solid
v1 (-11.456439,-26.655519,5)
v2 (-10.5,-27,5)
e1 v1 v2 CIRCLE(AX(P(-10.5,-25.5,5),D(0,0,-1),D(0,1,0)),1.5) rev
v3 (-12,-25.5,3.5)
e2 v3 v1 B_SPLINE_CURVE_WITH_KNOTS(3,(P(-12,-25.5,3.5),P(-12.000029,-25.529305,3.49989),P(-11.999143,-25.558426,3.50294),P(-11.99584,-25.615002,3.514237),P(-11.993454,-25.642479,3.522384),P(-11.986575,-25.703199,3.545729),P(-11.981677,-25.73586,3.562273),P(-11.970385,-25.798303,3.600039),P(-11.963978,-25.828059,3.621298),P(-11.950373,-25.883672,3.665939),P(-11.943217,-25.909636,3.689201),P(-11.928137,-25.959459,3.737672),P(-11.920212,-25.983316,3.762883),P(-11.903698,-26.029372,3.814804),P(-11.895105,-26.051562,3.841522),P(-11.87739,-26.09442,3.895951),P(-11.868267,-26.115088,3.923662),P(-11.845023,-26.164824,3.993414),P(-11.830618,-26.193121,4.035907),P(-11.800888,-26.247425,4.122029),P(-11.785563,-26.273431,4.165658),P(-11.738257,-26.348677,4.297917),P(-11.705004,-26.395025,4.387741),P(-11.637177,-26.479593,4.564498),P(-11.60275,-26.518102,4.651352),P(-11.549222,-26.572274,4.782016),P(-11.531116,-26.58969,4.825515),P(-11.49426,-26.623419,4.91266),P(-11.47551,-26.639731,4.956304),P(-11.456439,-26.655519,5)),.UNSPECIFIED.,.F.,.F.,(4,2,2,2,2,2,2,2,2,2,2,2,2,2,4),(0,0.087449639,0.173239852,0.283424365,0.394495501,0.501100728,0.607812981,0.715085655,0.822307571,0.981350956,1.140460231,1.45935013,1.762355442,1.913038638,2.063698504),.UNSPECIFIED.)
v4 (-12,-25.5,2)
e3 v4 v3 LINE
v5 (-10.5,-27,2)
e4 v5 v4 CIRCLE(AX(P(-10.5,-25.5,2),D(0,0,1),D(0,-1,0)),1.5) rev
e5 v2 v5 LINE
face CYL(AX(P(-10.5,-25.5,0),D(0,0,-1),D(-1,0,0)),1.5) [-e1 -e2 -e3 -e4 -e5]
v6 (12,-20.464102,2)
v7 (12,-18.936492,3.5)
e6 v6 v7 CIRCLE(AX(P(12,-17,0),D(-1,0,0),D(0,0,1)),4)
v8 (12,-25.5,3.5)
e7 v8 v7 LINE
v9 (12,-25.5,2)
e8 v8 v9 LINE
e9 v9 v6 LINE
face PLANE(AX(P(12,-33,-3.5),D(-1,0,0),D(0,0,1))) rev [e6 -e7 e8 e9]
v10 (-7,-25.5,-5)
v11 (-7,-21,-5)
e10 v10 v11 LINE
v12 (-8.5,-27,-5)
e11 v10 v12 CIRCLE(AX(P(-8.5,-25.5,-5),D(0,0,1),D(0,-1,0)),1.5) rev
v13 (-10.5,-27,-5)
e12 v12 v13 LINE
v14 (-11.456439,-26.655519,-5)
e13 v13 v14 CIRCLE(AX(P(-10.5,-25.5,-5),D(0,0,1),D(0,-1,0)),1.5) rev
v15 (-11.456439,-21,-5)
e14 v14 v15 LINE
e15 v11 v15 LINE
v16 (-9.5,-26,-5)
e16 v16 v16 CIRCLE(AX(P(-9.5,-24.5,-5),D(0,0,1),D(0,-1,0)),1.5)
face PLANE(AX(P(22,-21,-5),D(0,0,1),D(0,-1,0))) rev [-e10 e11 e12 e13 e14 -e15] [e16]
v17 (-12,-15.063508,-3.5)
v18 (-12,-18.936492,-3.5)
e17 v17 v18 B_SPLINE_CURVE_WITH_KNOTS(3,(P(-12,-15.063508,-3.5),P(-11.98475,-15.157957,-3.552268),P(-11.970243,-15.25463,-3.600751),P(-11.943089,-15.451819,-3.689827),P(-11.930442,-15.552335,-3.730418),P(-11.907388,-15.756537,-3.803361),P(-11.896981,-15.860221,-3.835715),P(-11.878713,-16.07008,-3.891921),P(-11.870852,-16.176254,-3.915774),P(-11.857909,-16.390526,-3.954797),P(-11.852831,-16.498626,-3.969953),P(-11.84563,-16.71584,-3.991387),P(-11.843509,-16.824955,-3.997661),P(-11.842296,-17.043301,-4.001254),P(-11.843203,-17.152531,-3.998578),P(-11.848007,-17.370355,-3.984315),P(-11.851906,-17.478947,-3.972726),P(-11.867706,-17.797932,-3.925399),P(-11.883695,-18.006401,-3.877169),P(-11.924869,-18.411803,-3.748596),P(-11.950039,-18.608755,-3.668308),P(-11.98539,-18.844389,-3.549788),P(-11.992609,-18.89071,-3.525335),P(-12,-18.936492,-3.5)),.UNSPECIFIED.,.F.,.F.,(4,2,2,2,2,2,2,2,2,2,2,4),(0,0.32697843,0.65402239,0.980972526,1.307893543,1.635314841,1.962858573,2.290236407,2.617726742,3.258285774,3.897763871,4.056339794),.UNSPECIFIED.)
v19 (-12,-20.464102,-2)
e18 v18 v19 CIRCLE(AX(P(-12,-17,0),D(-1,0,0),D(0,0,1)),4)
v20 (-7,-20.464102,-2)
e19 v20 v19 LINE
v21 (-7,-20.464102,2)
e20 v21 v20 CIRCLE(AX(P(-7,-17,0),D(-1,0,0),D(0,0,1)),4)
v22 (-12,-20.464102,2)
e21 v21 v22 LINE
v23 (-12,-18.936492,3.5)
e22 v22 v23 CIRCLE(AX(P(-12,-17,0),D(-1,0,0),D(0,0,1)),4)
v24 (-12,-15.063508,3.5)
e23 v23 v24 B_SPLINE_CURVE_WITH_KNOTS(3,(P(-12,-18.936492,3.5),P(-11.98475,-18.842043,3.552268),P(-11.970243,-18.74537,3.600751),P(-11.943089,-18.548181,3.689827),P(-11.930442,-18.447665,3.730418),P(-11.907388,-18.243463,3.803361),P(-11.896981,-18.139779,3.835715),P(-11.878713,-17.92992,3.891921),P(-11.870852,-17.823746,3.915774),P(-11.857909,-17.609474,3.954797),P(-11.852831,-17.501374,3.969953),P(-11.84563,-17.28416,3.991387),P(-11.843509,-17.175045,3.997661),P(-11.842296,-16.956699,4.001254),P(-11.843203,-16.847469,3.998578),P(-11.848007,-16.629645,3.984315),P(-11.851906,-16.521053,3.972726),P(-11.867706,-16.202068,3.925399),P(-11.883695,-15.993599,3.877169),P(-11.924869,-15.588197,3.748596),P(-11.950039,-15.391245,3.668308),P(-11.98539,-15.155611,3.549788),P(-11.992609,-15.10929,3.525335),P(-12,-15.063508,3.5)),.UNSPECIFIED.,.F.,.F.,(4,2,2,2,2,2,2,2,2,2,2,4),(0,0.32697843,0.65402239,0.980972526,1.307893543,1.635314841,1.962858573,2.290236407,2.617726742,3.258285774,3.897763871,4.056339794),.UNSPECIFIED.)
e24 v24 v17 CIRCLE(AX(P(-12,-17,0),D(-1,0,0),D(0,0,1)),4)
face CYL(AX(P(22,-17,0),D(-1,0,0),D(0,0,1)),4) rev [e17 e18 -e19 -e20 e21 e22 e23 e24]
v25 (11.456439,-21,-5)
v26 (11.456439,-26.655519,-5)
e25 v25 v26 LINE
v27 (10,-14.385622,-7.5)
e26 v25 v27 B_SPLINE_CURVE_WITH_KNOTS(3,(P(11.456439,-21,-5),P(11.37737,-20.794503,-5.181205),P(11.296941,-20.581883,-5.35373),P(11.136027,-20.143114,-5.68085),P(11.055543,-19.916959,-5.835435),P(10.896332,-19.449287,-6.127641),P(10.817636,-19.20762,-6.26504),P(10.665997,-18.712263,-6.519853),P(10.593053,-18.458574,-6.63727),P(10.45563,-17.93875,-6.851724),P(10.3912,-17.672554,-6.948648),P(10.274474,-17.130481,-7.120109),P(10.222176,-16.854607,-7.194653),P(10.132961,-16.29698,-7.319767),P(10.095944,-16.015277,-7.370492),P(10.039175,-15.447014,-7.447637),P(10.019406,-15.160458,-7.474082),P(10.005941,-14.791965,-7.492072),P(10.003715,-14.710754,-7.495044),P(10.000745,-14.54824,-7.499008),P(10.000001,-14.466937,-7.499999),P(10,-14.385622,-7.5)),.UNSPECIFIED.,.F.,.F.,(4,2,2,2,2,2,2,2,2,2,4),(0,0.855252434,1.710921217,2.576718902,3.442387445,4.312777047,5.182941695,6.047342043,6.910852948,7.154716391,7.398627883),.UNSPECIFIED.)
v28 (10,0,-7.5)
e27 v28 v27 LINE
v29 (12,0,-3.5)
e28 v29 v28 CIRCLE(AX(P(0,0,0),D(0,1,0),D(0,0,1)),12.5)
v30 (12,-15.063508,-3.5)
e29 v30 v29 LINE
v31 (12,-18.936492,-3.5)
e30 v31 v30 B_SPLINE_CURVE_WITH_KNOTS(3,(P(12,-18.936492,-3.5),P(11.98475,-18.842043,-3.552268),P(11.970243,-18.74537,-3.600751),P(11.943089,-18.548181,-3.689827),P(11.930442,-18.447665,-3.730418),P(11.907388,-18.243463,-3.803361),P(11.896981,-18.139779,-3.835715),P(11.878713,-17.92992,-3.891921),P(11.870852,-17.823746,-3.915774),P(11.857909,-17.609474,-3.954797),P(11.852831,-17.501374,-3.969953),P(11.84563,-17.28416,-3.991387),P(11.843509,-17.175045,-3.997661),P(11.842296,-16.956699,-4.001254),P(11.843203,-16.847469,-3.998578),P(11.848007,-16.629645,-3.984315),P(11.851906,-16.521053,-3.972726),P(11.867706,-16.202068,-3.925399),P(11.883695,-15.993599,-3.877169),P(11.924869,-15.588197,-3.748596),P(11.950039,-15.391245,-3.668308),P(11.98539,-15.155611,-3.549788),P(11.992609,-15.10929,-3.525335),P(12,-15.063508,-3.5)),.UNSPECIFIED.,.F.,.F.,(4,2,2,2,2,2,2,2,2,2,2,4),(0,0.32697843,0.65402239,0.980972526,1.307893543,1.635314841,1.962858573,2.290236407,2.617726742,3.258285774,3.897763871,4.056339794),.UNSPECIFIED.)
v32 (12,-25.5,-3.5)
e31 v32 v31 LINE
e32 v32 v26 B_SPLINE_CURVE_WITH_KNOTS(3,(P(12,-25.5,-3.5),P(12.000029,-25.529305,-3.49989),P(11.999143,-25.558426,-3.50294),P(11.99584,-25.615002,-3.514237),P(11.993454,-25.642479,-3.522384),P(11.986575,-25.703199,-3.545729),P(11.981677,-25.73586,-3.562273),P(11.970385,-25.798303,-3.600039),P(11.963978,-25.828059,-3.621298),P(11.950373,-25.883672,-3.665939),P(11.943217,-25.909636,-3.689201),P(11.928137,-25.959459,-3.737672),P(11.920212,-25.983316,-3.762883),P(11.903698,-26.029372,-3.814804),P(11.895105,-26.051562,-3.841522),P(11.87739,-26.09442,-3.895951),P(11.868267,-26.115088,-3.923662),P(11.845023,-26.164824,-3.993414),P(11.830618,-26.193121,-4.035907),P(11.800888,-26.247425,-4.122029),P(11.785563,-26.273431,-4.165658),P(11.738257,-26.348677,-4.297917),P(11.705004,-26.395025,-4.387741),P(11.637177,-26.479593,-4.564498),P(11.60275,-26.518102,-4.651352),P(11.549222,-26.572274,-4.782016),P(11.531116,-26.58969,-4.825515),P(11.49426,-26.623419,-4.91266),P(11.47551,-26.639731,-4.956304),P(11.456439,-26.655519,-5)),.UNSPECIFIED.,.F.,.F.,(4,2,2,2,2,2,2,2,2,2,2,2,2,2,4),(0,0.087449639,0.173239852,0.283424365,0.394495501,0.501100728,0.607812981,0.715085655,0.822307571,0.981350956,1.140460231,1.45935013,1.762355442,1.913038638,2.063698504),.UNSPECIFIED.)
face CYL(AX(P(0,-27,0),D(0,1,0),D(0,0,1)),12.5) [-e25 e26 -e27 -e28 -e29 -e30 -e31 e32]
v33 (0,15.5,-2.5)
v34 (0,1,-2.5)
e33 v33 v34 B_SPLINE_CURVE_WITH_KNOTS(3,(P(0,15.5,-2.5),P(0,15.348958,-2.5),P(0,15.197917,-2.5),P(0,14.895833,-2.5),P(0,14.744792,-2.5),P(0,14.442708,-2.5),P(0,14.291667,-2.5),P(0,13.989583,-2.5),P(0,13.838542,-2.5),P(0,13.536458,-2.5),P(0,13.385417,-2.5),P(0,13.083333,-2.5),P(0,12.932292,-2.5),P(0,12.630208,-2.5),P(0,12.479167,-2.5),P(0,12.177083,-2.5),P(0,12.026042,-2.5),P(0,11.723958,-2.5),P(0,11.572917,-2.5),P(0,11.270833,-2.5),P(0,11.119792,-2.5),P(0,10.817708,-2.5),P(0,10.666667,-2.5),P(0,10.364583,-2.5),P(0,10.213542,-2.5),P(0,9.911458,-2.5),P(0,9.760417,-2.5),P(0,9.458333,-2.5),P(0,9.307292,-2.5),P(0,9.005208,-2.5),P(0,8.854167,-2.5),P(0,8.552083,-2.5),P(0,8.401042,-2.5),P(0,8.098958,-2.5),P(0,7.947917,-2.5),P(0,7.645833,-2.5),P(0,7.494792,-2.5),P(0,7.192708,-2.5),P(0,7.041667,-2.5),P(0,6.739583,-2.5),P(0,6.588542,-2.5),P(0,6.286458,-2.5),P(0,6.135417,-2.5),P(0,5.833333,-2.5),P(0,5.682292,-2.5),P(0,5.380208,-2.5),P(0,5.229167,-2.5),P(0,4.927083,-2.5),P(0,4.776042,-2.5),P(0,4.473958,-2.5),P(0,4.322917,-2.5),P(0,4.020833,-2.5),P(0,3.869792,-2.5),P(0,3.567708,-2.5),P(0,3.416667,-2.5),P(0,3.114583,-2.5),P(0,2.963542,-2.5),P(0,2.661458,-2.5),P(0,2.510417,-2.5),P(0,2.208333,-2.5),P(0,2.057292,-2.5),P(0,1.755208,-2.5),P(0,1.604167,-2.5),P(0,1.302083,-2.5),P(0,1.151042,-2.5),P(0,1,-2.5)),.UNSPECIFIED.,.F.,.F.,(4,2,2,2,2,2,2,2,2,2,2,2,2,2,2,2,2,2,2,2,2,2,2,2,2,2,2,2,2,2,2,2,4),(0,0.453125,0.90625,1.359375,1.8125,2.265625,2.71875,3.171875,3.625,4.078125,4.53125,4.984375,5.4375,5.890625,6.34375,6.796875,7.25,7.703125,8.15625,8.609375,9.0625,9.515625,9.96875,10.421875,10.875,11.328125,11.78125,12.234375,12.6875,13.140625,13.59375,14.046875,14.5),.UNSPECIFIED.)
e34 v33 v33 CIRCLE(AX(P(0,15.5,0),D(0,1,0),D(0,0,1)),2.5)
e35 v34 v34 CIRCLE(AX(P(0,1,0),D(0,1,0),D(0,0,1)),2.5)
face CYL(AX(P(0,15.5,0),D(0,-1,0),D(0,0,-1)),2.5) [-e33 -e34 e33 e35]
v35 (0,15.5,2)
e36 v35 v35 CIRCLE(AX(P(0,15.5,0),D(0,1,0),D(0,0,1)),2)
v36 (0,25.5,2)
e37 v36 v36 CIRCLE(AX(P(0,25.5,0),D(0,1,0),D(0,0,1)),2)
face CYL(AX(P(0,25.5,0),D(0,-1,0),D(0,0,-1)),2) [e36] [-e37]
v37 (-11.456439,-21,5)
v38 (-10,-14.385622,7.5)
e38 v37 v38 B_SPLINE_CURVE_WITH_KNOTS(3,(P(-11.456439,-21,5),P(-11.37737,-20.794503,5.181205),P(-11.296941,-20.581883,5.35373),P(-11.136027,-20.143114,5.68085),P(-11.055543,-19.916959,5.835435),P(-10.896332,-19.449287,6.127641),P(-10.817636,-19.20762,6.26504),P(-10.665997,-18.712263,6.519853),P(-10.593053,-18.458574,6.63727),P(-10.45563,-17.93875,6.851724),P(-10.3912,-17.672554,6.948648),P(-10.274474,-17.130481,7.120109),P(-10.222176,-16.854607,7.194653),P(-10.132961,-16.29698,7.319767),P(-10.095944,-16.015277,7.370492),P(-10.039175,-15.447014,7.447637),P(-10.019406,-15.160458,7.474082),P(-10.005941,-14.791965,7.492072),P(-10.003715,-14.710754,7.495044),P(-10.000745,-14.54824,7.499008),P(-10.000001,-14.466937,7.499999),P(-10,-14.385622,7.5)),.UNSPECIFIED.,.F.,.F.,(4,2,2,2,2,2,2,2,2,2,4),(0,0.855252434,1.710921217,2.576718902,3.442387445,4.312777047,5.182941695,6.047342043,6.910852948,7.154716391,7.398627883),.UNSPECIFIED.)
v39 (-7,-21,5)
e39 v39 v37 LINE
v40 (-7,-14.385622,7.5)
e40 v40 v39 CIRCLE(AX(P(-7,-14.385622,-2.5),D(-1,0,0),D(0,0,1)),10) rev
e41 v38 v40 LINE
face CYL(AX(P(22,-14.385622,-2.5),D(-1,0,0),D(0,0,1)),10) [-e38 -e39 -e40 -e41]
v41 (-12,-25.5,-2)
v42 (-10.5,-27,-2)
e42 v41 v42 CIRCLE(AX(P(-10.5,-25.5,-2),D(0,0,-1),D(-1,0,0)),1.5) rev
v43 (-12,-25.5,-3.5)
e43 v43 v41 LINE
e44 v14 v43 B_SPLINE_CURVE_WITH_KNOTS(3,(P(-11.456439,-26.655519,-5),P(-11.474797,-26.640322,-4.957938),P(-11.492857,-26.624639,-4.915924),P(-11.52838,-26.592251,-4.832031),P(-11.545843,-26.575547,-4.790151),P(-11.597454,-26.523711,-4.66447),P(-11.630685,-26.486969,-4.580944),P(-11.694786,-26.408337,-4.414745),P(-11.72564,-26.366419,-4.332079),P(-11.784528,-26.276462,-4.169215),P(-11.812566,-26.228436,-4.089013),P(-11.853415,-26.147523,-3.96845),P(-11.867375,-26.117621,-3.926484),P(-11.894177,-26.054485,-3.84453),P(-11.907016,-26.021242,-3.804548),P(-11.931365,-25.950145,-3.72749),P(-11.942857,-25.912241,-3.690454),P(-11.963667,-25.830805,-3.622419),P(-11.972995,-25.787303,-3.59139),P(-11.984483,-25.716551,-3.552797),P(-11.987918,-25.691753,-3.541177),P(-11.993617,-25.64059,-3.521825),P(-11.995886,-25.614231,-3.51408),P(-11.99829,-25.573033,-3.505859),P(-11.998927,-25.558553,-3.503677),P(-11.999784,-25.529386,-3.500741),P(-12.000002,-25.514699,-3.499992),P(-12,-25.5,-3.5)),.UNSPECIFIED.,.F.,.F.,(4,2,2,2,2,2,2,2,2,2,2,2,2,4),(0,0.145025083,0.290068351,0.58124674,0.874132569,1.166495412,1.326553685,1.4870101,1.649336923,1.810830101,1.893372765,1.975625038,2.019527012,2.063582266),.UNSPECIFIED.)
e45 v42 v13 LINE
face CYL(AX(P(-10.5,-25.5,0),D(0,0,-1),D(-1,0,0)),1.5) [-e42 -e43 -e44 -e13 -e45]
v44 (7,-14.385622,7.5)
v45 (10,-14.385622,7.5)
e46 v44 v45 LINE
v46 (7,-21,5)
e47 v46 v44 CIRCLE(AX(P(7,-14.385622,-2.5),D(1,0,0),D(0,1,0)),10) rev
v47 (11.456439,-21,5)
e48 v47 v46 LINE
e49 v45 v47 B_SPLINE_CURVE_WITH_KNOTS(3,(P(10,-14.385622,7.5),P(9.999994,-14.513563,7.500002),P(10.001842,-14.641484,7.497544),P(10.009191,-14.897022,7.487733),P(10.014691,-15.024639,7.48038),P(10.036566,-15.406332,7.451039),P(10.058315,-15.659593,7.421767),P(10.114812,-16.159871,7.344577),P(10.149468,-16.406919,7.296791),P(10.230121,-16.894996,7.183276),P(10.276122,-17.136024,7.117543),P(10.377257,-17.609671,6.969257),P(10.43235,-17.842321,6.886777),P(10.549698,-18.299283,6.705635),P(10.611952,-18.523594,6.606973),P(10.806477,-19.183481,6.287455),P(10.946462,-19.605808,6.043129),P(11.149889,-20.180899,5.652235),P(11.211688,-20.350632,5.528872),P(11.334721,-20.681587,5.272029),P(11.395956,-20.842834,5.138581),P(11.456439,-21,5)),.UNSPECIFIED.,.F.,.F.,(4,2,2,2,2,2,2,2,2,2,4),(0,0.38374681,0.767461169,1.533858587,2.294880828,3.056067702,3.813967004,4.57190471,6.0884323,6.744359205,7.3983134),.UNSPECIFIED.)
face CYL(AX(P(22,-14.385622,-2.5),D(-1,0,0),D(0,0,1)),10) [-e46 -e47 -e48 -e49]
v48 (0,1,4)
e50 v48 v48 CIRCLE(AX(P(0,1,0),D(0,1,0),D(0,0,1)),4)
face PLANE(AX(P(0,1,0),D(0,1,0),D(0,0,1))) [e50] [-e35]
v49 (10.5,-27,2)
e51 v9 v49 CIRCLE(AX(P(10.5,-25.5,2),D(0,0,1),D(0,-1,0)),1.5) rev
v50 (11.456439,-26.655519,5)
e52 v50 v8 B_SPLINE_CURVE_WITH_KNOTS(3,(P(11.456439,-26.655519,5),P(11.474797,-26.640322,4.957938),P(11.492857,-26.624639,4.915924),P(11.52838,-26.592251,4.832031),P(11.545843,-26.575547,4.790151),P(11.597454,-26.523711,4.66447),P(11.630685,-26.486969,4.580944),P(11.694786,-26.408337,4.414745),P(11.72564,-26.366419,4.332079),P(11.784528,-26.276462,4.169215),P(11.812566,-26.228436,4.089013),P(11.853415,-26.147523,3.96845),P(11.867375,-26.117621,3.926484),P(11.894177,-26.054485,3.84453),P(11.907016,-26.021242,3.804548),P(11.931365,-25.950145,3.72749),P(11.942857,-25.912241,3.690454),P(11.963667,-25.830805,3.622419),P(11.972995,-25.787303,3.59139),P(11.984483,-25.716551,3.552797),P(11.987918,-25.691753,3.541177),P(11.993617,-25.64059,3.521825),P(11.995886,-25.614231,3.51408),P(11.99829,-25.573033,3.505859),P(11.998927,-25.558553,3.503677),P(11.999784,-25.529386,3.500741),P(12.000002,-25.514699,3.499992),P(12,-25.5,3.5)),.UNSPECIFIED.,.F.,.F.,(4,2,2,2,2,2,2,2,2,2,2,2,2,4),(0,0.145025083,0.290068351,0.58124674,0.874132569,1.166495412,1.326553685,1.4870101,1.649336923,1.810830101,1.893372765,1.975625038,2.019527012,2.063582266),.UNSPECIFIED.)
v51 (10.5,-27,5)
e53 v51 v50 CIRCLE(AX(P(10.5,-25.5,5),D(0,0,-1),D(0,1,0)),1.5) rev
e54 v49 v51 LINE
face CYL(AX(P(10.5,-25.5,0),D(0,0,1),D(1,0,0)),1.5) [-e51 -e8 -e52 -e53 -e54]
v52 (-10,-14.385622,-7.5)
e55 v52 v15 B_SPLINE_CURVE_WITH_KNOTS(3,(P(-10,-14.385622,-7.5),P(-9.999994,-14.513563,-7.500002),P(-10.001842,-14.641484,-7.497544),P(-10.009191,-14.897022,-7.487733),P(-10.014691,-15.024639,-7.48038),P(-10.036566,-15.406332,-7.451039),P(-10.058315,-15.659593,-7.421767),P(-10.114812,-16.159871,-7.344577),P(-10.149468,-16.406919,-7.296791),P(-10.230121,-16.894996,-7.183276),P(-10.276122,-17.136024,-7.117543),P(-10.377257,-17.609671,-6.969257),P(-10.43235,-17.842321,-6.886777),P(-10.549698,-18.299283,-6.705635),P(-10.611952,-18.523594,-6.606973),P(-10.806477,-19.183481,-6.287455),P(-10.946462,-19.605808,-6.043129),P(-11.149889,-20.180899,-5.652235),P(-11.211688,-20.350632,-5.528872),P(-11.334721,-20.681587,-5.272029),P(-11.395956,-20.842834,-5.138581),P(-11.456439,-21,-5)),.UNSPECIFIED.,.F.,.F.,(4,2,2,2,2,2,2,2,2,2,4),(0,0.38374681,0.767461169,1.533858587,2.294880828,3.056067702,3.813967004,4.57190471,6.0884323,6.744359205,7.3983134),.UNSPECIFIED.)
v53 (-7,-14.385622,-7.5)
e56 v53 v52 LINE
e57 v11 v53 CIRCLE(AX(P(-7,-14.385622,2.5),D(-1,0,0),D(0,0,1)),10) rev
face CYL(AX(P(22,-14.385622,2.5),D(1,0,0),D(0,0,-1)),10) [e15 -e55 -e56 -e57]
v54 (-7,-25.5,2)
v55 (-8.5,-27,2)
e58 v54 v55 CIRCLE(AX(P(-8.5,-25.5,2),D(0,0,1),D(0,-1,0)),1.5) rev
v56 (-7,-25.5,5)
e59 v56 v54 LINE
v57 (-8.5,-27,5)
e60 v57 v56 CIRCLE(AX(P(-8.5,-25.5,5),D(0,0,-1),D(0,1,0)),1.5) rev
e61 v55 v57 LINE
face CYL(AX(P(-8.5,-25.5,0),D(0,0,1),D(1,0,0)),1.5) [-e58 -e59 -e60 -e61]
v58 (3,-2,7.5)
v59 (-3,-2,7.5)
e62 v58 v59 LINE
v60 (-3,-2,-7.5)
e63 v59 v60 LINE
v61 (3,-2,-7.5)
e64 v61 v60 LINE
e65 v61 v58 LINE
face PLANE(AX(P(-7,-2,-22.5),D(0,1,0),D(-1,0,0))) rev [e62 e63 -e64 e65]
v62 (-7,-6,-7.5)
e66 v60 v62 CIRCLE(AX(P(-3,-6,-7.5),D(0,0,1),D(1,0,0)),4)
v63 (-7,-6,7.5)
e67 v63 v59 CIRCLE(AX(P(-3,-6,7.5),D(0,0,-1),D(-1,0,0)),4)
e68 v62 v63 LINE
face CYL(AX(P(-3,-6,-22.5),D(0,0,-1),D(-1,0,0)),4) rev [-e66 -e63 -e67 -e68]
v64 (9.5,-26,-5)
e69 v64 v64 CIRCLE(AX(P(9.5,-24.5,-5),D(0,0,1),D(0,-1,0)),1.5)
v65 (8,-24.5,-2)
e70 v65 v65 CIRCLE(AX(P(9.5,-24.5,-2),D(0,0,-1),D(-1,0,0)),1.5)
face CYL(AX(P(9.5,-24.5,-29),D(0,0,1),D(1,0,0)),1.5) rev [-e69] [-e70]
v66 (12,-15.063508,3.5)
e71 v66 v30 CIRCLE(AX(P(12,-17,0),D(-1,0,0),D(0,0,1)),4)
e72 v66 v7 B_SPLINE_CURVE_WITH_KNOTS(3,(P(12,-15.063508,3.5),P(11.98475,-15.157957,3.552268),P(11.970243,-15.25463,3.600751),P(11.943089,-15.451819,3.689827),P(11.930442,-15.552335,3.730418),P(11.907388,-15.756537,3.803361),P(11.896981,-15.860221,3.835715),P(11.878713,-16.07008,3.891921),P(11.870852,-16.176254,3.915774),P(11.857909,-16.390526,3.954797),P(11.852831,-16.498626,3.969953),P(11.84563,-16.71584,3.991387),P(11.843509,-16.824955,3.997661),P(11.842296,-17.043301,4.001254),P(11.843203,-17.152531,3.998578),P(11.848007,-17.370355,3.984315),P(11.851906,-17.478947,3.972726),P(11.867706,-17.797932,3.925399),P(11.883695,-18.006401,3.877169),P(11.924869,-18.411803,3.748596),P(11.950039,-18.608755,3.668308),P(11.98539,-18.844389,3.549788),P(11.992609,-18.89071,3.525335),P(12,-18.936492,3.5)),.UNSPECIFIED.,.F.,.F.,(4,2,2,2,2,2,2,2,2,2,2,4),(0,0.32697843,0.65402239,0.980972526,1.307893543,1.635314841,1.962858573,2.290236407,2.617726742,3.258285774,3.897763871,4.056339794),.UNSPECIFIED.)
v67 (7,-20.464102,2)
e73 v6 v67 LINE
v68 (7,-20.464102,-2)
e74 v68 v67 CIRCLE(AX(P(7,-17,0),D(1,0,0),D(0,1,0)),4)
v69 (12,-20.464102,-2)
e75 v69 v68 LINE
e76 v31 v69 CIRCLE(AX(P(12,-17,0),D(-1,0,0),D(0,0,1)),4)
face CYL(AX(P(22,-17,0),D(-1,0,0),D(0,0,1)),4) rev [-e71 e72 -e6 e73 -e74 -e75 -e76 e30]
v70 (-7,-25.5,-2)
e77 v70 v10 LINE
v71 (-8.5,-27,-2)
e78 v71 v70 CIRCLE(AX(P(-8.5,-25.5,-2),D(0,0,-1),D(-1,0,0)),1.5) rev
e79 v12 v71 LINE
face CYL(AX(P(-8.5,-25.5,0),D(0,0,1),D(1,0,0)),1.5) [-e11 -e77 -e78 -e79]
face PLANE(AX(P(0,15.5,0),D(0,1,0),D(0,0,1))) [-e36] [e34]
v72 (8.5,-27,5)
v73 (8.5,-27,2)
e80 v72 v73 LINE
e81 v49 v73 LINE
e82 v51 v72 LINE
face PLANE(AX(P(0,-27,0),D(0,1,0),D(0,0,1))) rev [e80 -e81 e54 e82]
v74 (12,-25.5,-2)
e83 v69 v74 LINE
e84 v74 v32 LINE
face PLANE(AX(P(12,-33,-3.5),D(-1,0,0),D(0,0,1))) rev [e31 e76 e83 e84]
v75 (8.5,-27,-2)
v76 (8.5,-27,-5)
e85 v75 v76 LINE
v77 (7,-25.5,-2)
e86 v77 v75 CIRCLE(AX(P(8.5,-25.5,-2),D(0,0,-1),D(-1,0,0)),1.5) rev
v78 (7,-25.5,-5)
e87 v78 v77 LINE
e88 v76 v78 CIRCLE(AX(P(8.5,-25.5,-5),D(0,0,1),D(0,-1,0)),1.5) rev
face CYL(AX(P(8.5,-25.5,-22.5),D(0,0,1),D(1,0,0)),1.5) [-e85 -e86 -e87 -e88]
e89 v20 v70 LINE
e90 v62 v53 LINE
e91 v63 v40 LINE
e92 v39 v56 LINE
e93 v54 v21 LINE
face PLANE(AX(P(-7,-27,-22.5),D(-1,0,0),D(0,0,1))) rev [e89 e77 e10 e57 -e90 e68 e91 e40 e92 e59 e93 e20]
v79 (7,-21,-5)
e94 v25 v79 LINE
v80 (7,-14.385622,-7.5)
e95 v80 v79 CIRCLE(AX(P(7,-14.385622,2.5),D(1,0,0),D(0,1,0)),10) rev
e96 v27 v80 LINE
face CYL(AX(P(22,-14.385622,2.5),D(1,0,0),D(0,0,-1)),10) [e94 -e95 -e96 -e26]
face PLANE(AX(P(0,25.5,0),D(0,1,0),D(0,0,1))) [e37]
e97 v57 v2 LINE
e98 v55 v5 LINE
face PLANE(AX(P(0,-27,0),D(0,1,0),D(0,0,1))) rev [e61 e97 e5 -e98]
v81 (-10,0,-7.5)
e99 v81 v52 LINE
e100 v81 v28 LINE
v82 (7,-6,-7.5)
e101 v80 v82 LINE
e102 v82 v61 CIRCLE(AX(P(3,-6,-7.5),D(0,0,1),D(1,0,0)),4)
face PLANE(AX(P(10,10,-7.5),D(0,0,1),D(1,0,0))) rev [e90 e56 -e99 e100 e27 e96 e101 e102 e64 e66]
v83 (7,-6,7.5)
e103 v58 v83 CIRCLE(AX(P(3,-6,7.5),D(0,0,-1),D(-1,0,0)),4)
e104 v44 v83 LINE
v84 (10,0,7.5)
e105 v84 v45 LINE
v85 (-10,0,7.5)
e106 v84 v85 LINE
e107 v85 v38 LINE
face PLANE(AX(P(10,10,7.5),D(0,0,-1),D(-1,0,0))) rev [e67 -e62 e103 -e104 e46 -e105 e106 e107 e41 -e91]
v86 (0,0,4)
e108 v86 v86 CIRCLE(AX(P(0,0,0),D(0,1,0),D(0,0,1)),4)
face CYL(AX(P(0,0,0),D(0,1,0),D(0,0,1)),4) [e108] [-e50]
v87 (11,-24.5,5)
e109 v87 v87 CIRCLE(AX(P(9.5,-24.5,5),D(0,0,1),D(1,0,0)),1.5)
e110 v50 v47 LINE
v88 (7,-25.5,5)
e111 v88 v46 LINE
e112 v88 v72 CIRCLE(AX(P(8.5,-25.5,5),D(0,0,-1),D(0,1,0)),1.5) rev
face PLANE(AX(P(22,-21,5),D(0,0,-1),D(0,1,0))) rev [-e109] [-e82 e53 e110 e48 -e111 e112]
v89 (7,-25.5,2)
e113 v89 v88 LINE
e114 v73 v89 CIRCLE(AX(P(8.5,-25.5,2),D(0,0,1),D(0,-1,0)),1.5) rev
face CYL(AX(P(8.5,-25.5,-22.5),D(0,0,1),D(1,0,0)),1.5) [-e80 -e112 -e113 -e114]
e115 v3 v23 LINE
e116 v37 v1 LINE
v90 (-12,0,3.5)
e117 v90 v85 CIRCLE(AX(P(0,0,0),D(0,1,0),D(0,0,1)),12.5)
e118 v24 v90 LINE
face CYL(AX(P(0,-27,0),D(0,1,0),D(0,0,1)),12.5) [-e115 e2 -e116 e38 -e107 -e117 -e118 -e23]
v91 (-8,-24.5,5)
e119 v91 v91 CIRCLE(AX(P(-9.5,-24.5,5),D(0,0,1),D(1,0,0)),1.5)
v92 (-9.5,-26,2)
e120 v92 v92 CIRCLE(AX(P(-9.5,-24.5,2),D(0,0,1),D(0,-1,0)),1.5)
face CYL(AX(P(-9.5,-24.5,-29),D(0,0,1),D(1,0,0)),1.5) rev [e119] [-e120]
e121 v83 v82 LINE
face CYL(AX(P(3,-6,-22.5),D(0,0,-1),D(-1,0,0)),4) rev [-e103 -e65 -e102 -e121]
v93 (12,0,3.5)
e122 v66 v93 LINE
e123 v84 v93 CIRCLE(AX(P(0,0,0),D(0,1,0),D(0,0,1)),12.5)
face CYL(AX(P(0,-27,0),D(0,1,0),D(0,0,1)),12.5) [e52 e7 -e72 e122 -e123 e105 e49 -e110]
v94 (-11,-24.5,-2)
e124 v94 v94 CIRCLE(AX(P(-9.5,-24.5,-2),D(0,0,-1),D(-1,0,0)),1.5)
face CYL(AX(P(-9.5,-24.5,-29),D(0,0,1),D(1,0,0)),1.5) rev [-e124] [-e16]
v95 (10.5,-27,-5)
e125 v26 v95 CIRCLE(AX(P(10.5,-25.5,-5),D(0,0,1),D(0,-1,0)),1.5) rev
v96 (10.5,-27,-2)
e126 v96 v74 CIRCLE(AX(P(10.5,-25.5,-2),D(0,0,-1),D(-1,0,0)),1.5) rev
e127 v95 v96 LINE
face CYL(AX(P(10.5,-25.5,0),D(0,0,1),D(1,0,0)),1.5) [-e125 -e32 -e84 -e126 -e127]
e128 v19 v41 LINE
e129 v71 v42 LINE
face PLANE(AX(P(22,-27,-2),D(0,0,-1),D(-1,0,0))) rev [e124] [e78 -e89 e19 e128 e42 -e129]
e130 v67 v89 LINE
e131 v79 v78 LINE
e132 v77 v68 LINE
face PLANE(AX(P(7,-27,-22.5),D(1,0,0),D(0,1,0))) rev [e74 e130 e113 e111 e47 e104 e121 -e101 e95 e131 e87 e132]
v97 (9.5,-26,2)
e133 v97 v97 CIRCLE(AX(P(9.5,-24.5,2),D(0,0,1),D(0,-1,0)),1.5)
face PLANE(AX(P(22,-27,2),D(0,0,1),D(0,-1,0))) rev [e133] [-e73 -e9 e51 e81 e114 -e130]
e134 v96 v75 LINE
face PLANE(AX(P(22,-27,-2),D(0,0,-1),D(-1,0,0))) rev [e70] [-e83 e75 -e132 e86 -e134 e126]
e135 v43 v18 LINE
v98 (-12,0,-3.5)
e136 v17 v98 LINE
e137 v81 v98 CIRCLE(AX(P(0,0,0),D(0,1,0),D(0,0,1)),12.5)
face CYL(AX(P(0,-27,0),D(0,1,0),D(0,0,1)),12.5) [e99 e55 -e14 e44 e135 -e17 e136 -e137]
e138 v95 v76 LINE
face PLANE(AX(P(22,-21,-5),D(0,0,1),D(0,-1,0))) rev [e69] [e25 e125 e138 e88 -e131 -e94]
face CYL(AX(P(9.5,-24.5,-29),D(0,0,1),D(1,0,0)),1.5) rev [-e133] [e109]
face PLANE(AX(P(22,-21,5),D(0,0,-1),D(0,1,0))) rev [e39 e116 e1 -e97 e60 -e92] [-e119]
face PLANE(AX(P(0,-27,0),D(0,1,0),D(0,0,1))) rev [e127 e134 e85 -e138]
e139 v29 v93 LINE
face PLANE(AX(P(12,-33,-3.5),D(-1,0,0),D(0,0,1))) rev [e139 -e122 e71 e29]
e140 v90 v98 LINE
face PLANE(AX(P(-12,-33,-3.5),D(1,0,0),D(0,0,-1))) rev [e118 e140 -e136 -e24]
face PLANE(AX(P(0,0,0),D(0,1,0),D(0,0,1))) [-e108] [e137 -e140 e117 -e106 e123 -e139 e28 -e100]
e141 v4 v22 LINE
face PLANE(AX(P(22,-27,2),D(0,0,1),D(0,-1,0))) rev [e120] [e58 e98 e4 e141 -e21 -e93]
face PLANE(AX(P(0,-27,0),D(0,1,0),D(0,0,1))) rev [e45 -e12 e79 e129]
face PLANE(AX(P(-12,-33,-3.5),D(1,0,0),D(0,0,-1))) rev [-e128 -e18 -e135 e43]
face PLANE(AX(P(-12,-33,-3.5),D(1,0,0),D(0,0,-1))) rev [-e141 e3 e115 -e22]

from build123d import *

# Parameters (mm, degrees)
SKETCH_1_R          = 12.5
EXTRUDE_1_DEPTH     = 27
CUT_EXTRUDE_START   = -37
CUT_EXTRUDE_1_DEPTH = 37
CUT_EXTRUDE_START_2 = 10
CUT_EXTRUDE_2_DEPTH = 43
SKETCH_4_W          = 14
SKETCH_4_H          = 25
CUT_EXTRUDE_3_DEPTH = 30
FILLET_1_R          = 4
SKETCH_7_R          = 4
SKETCH_5_R          = 4
CUT_EXTRUDE_4_DEPTH = 34
SKETCH_9_W          = 2.5
SKETCH_9_H          = 6
CUT_EXTRUDE_5_DEPTH = 34
SKETCH_10_R         = 1.5
CUT_EXTRUDE_6_DEPTH = 34
FILLET_3_R          = 1.5
SKETCH_11_R         = 2.5
EXTRUDE_2_DEPTH     = 14.5
SKETCH_12_R         = 2
EXTRUDE_3_DEPTH     = 10
FILLET_4_R          = 10


with BuildPart() as part:
    # 草图1 → 凸台-拉伸1 (new body)
    with BuildSketch(Plane(origin=(0, 0, 0), x_dir=(1, 0, 0), z_dir=(0, 1, 0))):
        with Locations(Location((0, 0, 0), (0, 0, 270))):
            Circle(SKETCH_1_R)
    extrude(amount=-EXTRUDE_1_DEPTH)

    # 草图2 → 切除-拉伸1 (cut)
    with BuildSketch(Plane(origin=(0, -27, 0), x_dir=(-1, 0, 0), z_dir=(0, -1, 0)).offset(CUT_EXTRUDE_START)):
        with BuildLine():
            Line((-10, 7.5), (10, 7.5))
            ThreePointArc((10, 7.5), (0, 12.5), (-10, 7.5))
        make_face()
        with BuildLine():
            Line((-10, -7.5), (10, -7.5))
            ThreePointArc((10, -7.5), (0, -12.5), (-10, -7.5))
        make_face()
    extrude(amount=CUT_EXTRUDE_1_DEPTH, mode=Mode.SUBTRACT)

    # 草图3 → 切除-拉伸2 (cut)
    with BuildSketch(Plane(origin=(0, 0, 0), x_dir=(1, 0, 0), z_dir=(0, 1, 0)).offset(CUT_EXTRUDE_START_2)):
        with BuildLine():
            Line((-12, 3.5), (-12, -3.5))
            ThreePointArc((-12, -3.5), (-12.5, 0), (-12, 3.5))
        make_face()
        with BuildLine():
            Line((12, 3.5), (12, -3.5))
            ThreePointArc((12, -3.5), (12.5, 0), (12, 3.5))
        make_face()
    extrude(amount=-CUT_EXTRUDE_2_DEPTH, mode=Mode.SUBTRACT)

    # 草图4 → 切除-拉伸3 (cut)
    with BuildSketch(Plane.XY.offset(7.5)):
        with Locations((0, -14.5)):
            Rectangle(SKETCH_4_W, SKETCH_4_H)
    extrude(amount=-CUT_EXTRUDE_3_DEPTH, mode=Mode.SUBTRACT)

    # 圆角1
    fillet_1_edges = [part.edges().sort_by_distance(p)[0] for p in [
        (-7, -2, 0),
        (7, -2, 0),
    ]]
    fillet(fillet_1_edges, radius=FILLET_1_R)

    # 草图7 → 放样2 section 0
    with BuildSketch(Plane(origin=(0, 0, 0), x_dir=(1, 0, 0), z_dir=(0, 1, 0))):
        Circle(SKETCH_7_R)
    # 草图5 → 放样2 section 1
    with BuildSketch(Plane(origin=(0, 1, 0), x_dir=(1, 0, 0), z_dir=(0, 1, 0))):
        Circle(SKETCH_5_R)
    loft()

    # 草图8 → 切除-拉伸4 (cut)
    with BuildSketch(Plane.ZY.offset(12)):
        with BuildLine():
            Line((-2, -27), (2, -27))
            Line((2, -27), (2, -20.464101615))
            ThreePointArc((2, -20.464101615), (0, -13), (-2, -20.464101615))
            Line((-2, -20.464101615), (-2, -27))
        make_face()
    extrude(amount=-CUT_EXTRUDE_4_DEPTH, mode=Mode.SUBTRACT)

    # 草图9 → 切除-拉伸5 (cut)
    with BuildSketch(Plane.ZY.offset(12)):
        with Locations((6.25, -24)):
            Rectangle(SKETCH_9_W, SKETCH_9_H)
        with Locations((-6.25, -24)):
            Rectangle(SKETCH_9_W, SKETCH_9_H)
    extrude(amount=-CUT_EXTRUDE_5_DEPTH, mode=Mode.SUBTRACT)

    # 草图10 → 切除-拉伸6 (cut)
    with BuildSketch(Plane.XY.offset(5)):
        with Locations(Location((-9.5, -24.5, 0), (0, 0, 270))):
            Circle(SKETCH_10_R)
        with Locations(Location((9.5, -24.5, 0), (0, 0, 270))):
            Circle(SKETCH_10_R)
    extrude(amount=-CUT_EXTRUDE_6_DEPTH, mode=Mode.SUBTRACT)

    # 圆角3
    fillet_3_edges = [part.edges().sort_by_distance(p)[0] for p in [
        (-12, -27, 2.75),
        (-12, -27, -2.75),
        (-7, -27, -3.5),
        (-7, -27, 3.5),
        (7, -27, -3.5),
        (7, -27, 3.5),
        (12, -27, 2.75),
        (12, -27, -2.75),
    ]]
    fillet(fillet_3_edges, radius=FILLET_3_R)

    # 草图11 → 凸台-拉伸2 (add)
    with BuildSketch(Plane(origin=(0, 1, 0), x_dir=(1, 0, 0), z_dir=(0, 1, 0))):
        with Locations(Location((0, 0, 0), (0, 0, 90))):
            Circle(SKETCH_11_R)
    extrude(amount=EXTRUDE_2_DEPTH)

    # 草图12 → 凸台-拉伸3 (add)
    with BuildSketch(Plane(origin=(0, 15.5, 0), x_dir=(1, 0, 0), z_dir=(0, 1, 0))):
        with Locations(Location((0, 0, 0), (0, 0, 270))):
            Circle(SKETCH_12_R)
    extrude(amount=EXTRUDE_3_DEPTH)

    # 圆角4
    # the kernel refuses this fillet: 10 mm, written as the material it takes off along each edge
    with BuildSketch(Plane(origin=(-9.535945694, -21, 7.5), x_dir=(0, 1, 0), z_dir=(1, 0, 0)), Plane(origin=(-26.535945694, -21, 7.5), x_dir=(0, 1, 0), z_dir=(1, 0, 0))) as fillet_4_piece_1:
        with BuildLine():
            CenterArc((6.614378278, -10), FILLET_4_R, 90, 41.409622109)
            Line((0, -2.5), (-0.132287566, -2.35))
            ThreePointArc((-0.132287566, -2.35), (-0.2, -1.25), (-0.2, 0))
            Line((-0.2, 0), (0, 0.2))
            Line((0, 0.2), (6.614378278, 0.2))
            Line((6.614378278, 0.2), (6.614378278, 0))
        make_face()
    extrude(amount=36.071891388, mode=Mode.SUBTRACT)
    with BuildSketch(Plane(origin=(-9.535945694, -21, -7.5), x_dir=(0, 0, 1), z_dir=(1, 0, 0))) as fillet_4_piece_2:
        with BuildLine():
            CenterArc((10, -6.614378278), FILLET_4_R, 138.590377891, 41.409622109)
            Line((0, -6.614378278), (-0.2, -6.614378278))
            Line((-0.2, -6.614378278), (-0.2, 0))
            Line((-0.2, 0), (0, 0.2))
            ThreePointArc((0, 0.2), (1.25, 0.2), (2.35, 0.132287566))
            Line((2.35, 0.132287566), (2.5, 0))
        make_face()
    extrude(amount=36.071891388, mode=Mode.SUBTRACT)
    with BuildSketch(Plane(origin=(-26.535945694, -21, -7.5), x_dir=(0, 1, 0), z_dir=(1, 0, 0))) as fillet_4_piece_3:
        with BuildLine():
            CenterArc((6.614378278, 10), FILLET_4_R, 228.590377891, 41.409622109)
            Line((0, 2.5), (-0.132287566, 2.35))
            ThreePointArc((-0.132287566, 2.35), (-0.2, 1.25), (-0.2, 0))
            Line((-0.2, 0), (0, -0.2))
            Line((0, -0.2), (6.614378278, -0.2))
            Line((6.614378278, -0.2), (6.614378278, 0))
        make_face()
    extrude(amount=36.071891388, mode=Mode.SUBTRACT)


solid = part.part
